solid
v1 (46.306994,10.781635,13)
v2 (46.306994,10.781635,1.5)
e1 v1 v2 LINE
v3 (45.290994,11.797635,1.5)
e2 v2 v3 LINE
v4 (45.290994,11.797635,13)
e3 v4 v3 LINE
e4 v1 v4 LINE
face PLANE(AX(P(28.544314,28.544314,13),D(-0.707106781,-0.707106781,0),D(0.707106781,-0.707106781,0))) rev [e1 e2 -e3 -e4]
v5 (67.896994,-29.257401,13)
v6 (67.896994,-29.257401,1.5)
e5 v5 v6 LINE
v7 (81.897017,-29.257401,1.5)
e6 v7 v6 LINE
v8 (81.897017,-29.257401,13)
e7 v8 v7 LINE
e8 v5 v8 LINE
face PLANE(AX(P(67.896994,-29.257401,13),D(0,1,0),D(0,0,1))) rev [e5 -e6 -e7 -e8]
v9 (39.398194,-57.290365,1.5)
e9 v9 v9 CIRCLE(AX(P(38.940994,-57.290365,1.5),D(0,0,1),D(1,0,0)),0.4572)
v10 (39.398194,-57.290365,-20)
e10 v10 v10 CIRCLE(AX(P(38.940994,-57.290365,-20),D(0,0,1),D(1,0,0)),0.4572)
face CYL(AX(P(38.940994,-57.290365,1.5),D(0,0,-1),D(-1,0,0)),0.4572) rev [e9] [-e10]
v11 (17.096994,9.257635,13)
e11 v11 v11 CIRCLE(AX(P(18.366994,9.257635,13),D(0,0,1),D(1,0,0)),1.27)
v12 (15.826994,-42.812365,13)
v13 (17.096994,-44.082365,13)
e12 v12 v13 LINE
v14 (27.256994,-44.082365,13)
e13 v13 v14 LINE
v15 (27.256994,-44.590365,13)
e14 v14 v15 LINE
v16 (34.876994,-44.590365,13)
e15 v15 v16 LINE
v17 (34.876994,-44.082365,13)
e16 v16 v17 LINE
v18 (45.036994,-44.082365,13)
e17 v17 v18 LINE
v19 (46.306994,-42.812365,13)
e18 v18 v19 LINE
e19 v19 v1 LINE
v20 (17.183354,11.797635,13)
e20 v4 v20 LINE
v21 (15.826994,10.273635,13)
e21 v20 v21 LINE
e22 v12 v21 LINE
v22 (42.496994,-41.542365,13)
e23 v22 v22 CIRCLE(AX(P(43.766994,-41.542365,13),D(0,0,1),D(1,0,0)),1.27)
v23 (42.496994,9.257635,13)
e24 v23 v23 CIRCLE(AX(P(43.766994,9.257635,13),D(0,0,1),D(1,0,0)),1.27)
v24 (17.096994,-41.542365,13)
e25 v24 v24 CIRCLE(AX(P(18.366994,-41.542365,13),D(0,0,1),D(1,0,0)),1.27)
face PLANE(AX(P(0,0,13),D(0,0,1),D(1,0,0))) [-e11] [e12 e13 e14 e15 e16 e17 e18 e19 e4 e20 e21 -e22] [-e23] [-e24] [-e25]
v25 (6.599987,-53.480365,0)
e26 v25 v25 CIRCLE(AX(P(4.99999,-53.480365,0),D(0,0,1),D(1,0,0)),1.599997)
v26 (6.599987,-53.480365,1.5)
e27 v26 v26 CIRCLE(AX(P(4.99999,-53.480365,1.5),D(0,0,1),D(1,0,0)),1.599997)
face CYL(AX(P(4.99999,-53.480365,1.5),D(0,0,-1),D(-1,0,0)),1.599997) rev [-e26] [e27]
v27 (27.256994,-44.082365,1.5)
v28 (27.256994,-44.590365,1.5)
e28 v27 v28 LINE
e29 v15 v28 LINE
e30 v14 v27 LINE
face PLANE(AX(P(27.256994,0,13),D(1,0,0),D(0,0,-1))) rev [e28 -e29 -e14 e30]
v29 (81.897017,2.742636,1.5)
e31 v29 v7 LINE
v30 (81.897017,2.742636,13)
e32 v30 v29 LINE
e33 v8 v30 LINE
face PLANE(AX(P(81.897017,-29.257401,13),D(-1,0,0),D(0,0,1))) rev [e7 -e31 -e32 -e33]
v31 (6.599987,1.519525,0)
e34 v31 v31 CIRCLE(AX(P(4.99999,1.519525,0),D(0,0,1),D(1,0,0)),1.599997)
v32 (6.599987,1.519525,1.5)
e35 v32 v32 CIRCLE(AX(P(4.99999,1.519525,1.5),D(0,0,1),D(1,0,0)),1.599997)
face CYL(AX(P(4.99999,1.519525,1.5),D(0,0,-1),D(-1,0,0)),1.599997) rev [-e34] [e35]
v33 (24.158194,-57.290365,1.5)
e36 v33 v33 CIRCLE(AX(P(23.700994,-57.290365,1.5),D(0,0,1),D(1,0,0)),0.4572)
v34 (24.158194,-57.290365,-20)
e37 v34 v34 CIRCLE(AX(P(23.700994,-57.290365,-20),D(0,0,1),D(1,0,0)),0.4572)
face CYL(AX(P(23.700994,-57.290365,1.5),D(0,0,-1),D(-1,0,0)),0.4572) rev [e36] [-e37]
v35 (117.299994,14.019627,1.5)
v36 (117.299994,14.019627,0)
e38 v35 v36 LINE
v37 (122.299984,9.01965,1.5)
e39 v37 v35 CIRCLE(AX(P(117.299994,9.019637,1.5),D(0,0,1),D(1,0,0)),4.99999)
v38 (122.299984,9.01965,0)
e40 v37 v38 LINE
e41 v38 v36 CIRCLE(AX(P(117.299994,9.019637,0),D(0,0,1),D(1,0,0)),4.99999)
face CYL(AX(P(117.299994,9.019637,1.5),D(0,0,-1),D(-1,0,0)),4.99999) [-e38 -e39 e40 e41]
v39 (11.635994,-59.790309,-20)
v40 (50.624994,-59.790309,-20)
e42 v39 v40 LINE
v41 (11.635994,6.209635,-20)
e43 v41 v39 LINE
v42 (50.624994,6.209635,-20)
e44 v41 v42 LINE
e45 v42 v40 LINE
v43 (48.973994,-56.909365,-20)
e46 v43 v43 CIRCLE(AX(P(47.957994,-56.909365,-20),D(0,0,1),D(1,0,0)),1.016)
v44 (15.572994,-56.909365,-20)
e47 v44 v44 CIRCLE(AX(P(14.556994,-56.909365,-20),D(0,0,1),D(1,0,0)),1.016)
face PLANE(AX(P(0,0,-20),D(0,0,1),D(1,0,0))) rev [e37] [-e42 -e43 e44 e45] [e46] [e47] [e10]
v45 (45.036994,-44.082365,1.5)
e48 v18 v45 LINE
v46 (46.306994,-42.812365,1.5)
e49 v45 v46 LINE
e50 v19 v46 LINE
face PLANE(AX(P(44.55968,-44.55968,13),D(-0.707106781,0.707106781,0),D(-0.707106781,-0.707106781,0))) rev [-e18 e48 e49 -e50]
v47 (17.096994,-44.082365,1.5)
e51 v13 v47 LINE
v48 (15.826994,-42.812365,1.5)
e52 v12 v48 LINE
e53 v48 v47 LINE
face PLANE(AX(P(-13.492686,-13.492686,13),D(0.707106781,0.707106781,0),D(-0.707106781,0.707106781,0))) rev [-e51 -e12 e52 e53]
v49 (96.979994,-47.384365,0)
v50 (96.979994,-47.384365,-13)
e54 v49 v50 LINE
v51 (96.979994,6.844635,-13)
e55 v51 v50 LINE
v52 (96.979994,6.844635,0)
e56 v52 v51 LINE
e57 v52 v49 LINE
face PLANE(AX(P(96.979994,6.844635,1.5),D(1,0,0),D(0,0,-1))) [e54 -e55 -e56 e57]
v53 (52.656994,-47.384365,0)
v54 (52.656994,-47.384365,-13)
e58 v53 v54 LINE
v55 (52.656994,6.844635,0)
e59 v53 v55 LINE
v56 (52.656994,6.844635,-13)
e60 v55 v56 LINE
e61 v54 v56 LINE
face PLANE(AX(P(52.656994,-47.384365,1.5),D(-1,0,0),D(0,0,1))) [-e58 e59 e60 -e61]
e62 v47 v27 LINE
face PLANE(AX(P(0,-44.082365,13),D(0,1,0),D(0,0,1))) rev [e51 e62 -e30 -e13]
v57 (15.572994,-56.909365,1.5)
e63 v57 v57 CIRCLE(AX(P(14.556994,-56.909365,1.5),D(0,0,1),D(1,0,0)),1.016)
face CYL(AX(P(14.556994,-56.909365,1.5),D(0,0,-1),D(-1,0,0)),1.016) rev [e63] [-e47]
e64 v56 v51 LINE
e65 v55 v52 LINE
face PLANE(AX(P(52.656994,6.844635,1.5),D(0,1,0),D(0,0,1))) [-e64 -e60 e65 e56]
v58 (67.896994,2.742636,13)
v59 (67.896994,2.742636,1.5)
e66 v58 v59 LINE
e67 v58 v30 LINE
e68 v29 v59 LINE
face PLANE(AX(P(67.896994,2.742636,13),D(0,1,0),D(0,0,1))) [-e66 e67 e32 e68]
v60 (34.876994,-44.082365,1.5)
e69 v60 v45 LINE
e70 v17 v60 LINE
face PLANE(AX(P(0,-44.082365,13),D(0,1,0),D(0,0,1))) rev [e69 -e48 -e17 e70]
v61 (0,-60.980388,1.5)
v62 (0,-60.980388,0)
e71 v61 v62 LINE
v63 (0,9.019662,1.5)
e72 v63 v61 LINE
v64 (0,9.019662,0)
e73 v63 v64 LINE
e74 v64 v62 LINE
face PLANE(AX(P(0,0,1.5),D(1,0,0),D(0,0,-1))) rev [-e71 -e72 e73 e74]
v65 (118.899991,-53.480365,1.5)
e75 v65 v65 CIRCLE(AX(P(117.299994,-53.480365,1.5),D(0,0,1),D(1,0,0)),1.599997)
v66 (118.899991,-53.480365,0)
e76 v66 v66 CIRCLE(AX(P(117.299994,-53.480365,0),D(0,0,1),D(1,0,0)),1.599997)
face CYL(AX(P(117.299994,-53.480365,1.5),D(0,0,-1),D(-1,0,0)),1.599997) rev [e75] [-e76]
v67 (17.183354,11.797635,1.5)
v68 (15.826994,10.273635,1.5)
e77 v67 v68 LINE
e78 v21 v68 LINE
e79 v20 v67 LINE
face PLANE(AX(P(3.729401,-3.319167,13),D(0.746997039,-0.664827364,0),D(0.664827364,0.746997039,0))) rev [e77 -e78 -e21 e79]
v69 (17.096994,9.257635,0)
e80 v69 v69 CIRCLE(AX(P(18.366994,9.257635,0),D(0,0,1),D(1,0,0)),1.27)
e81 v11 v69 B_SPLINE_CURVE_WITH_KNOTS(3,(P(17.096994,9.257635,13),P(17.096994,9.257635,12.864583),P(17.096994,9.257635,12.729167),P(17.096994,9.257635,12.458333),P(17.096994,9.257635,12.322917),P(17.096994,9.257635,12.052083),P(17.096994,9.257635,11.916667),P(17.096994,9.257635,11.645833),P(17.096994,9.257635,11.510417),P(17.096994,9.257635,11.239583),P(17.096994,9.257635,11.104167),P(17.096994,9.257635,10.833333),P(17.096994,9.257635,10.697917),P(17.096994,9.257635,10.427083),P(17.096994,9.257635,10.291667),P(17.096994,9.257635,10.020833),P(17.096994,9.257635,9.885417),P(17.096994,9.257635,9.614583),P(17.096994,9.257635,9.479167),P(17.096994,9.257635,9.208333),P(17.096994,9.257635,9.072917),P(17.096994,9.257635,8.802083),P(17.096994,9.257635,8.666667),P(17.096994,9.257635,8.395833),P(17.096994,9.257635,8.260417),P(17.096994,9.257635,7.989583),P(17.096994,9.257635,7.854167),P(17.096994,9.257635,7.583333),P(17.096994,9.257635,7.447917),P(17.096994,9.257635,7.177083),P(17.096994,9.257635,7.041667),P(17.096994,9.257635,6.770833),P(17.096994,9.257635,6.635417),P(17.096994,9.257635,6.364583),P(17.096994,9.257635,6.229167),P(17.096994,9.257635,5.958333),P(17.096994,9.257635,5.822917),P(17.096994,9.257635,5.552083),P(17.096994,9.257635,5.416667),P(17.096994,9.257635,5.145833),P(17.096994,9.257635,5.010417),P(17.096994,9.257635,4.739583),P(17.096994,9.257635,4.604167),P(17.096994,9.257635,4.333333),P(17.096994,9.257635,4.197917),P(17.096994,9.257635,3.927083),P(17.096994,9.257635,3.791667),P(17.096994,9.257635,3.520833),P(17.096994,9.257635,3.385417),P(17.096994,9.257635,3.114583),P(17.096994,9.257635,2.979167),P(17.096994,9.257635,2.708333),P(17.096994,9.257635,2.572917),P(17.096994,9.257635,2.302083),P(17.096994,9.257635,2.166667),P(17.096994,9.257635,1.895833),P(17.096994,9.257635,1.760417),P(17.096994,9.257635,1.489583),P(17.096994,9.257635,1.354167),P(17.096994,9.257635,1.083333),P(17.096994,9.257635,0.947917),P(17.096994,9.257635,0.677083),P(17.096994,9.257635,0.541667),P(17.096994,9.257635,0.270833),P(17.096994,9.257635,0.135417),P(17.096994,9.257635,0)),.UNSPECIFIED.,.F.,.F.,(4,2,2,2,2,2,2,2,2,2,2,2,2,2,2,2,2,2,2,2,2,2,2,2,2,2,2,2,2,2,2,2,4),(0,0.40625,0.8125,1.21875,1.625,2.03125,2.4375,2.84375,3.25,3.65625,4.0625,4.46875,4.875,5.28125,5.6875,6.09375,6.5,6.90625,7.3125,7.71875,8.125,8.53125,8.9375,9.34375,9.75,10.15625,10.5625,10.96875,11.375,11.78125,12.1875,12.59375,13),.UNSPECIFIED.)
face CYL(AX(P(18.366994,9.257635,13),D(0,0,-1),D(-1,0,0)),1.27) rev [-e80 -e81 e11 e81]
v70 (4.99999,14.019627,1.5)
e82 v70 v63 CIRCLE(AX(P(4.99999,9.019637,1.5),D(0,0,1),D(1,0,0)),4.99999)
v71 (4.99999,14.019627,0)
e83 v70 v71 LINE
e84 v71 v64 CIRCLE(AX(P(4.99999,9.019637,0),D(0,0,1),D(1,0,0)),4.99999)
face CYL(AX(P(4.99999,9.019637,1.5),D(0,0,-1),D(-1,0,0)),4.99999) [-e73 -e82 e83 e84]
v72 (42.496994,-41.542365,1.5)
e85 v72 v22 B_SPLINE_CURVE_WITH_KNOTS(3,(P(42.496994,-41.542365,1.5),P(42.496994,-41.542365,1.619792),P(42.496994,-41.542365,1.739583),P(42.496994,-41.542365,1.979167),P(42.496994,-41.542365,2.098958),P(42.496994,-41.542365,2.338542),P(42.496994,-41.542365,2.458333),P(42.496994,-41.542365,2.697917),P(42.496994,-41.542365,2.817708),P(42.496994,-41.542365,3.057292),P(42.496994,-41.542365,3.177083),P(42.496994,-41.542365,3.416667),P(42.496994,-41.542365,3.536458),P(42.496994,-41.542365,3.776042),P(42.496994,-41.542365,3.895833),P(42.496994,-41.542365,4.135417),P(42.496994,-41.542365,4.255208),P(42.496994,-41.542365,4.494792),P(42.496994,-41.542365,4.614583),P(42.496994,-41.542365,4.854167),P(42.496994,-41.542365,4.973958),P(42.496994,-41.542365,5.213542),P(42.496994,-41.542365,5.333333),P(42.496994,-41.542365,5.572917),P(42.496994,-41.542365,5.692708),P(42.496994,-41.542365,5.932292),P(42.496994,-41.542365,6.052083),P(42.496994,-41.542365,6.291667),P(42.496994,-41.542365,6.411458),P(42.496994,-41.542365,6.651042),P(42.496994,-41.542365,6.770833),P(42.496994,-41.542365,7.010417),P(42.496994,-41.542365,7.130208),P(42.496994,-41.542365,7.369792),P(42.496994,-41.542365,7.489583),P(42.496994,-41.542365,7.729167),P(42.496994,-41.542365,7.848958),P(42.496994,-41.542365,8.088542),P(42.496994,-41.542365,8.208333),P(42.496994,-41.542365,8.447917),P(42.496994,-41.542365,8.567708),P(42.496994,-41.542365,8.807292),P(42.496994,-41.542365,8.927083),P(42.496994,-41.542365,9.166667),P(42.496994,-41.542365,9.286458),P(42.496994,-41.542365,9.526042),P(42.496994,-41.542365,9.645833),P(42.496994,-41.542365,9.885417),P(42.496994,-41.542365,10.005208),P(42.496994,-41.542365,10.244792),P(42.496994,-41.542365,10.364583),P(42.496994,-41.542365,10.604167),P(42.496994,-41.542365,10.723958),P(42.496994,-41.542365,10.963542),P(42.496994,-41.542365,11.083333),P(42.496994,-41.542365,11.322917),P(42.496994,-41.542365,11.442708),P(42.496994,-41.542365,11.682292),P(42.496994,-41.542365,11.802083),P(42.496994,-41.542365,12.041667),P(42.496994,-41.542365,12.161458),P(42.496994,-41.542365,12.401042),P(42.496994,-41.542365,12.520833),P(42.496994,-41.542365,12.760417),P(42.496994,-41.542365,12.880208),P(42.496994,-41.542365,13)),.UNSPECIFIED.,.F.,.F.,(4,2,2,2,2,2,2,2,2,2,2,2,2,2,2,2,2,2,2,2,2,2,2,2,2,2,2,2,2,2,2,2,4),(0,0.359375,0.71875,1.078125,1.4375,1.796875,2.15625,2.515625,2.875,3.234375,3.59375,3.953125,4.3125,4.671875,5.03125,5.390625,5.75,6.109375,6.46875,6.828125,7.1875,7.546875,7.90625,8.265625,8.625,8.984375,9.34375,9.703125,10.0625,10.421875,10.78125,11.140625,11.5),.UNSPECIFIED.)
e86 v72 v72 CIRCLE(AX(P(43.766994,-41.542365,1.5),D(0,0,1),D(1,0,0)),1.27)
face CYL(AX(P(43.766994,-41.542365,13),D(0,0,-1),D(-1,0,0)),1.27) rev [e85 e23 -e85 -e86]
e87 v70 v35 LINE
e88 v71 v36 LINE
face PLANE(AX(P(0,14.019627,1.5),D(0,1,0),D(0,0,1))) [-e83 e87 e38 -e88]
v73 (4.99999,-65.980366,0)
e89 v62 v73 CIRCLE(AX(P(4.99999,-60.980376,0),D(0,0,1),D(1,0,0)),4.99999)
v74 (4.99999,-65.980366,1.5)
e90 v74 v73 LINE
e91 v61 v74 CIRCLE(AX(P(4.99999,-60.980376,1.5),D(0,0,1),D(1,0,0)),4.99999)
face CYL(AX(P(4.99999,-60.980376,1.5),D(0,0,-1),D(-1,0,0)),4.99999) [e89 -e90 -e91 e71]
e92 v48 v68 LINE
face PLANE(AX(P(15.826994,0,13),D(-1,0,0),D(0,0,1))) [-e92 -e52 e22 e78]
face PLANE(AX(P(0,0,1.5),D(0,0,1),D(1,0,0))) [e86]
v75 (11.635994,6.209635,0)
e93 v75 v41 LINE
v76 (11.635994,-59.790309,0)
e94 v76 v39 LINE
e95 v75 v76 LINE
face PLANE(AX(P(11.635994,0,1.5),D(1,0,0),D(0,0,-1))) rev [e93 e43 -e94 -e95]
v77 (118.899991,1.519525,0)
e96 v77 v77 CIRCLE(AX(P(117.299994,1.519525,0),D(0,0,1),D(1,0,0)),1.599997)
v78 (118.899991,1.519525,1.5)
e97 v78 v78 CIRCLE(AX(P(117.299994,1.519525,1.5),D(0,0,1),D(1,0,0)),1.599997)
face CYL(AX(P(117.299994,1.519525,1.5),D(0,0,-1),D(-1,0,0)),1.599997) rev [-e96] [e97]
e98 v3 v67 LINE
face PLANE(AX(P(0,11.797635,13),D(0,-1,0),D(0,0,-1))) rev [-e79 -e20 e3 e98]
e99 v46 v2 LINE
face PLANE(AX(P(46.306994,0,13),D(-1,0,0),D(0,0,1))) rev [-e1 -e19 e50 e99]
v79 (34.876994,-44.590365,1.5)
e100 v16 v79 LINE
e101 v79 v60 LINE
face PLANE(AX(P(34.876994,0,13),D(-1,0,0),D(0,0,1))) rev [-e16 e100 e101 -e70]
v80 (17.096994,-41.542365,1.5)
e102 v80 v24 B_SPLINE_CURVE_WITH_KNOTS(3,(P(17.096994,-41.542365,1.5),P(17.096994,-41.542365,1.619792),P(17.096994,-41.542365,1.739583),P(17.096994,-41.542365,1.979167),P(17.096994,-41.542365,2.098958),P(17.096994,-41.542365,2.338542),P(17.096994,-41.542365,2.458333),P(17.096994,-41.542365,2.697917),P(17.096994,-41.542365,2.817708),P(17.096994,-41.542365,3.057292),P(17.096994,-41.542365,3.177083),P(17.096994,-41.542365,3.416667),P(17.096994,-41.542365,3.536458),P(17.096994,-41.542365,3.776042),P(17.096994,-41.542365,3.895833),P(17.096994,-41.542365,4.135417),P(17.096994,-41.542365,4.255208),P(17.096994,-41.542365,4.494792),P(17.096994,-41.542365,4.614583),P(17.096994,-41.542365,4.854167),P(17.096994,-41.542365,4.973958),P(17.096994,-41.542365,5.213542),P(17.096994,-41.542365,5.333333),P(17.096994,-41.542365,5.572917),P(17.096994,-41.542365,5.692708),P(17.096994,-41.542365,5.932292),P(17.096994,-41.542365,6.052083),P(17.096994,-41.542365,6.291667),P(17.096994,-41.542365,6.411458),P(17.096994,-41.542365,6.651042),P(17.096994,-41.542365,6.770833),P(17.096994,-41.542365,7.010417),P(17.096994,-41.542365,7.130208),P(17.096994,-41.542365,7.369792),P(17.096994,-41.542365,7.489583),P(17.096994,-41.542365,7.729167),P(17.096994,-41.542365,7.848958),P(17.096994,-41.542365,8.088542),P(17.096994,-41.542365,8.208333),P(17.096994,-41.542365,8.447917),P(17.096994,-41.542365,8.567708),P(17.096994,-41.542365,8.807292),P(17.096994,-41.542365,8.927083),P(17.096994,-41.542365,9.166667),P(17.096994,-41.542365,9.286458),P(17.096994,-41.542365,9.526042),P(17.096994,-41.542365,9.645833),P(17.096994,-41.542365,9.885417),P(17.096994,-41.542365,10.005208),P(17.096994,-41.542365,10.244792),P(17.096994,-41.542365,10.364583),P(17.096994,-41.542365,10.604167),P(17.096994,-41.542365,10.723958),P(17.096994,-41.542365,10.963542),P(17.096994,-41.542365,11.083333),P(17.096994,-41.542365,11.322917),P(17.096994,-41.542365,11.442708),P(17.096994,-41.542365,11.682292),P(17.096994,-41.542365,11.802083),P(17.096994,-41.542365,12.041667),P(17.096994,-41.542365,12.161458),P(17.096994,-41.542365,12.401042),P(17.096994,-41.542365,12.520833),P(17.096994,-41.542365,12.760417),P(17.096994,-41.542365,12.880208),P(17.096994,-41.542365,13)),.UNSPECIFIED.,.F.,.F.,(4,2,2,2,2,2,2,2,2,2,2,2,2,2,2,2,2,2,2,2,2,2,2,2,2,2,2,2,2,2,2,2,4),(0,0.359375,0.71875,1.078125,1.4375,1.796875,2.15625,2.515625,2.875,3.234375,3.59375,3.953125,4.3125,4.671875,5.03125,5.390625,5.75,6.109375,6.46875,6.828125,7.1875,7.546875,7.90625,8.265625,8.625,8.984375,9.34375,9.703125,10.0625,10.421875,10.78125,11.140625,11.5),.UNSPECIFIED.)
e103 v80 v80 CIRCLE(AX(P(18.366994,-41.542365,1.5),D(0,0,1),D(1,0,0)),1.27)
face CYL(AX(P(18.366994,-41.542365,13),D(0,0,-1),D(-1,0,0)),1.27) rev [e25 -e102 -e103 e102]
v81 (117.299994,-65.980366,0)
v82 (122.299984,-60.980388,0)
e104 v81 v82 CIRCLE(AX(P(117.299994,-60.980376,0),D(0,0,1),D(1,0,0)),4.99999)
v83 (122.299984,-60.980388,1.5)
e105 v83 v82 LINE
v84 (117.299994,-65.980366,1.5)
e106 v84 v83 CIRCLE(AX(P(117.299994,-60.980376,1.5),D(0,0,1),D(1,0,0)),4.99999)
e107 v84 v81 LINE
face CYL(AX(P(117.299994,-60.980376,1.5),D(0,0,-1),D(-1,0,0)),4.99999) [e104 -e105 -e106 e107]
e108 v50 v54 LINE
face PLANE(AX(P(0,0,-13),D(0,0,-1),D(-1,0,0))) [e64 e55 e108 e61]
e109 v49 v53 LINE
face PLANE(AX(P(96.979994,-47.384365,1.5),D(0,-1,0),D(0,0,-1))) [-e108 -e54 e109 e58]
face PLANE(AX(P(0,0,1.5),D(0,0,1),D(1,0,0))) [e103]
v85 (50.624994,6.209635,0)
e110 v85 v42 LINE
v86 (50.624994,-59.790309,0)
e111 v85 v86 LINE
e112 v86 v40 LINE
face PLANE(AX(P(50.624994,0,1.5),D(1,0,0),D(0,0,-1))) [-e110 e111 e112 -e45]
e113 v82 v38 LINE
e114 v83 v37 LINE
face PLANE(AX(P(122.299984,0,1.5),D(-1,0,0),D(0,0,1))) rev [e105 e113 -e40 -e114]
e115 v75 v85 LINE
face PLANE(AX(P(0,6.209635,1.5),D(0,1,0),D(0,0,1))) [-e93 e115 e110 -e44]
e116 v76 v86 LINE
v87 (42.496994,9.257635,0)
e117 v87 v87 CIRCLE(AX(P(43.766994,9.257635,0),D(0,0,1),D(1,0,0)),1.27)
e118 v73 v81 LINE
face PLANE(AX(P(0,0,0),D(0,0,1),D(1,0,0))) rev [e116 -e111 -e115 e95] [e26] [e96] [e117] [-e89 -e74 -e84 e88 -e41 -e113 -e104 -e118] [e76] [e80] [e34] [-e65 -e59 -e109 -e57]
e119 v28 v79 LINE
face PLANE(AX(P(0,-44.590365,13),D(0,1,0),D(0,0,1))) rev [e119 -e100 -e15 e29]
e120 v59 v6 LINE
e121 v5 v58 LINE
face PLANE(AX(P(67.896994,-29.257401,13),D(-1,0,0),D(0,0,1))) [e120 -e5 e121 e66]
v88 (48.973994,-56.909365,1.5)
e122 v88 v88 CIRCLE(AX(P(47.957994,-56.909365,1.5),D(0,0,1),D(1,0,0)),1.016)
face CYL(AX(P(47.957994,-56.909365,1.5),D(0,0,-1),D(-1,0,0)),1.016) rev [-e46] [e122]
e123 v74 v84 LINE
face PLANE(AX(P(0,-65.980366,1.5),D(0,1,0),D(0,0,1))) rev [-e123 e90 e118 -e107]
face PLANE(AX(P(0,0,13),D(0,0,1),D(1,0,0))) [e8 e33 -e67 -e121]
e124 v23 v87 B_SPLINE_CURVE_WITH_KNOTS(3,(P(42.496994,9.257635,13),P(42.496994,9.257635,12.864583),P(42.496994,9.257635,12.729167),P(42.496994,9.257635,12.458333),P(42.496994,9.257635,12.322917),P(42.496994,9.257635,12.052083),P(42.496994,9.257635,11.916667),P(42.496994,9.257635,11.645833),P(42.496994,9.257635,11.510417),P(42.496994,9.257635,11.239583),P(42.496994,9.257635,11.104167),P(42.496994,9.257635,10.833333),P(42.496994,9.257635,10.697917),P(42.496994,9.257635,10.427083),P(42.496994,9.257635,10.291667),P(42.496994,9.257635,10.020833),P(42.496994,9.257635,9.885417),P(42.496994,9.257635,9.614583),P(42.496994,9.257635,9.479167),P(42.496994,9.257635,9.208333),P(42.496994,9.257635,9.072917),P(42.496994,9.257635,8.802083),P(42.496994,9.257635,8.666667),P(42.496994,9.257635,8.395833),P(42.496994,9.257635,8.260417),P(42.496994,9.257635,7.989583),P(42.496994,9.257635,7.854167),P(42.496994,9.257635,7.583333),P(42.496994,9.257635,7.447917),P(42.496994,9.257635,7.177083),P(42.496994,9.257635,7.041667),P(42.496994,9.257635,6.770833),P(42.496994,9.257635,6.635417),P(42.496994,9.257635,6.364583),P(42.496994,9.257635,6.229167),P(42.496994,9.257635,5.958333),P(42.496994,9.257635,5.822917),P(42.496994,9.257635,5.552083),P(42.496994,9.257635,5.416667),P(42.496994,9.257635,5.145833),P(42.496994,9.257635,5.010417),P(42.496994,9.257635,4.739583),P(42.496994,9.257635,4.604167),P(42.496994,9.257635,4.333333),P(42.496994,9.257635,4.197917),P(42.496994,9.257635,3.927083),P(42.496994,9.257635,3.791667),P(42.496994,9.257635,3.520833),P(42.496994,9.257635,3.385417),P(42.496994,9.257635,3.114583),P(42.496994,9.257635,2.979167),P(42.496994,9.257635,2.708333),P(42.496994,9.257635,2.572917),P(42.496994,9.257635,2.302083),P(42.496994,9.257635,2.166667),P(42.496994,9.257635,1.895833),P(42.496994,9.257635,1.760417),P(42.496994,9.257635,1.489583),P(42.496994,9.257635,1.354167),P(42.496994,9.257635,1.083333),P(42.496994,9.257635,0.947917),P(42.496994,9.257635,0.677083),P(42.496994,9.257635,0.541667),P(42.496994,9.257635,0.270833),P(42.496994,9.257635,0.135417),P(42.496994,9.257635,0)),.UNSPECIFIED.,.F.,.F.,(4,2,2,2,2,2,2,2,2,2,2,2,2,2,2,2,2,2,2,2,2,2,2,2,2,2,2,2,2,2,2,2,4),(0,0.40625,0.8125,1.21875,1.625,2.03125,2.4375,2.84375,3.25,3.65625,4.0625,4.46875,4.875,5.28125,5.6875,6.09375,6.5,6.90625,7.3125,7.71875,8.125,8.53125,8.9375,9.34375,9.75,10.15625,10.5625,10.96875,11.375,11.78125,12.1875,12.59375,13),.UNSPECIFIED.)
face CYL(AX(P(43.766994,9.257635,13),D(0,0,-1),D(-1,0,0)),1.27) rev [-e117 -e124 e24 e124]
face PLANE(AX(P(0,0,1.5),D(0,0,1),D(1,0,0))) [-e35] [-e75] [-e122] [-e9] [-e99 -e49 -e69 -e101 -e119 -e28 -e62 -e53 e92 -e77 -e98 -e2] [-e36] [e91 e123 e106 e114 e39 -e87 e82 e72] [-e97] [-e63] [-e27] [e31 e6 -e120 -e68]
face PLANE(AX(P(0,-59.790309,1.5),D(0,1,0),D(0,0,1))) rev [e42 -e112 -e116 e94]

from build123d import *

# Parameters (mm, degrees)
EXTRUDE_4_OUTLINE_R  = 1.5999968
EXTRUDE_4_OUTLINE_W  = 44.323
EXTRUDE_4_OUTLINE_H  = 54.229
EXTRUDE_4_DEPTH      = 1.5
EXTRUDE_5_DEPTH      = 1.5
EXTRUDE_5_DEPTH_BACK = 13
SKETCH_3_W           = 44.323
SKETCH_3_H           = 54.229
SKETCH_5_R           = 1.27
SKETCH_5_W           = 14.0000228
SKETCH_5_H           = 32.0000376
EXTRUDE_6_DEPTH      = 13
EXTRUDE_8_DEPTH      = 1.5
EXTRUDE_8_DEPTH_BACK = 20
SKETCH_6_W           = 38.989
SKETCH_6_H           = 65.9999442
SKETCH_6_R           = 1.016
SKETCH_6_R_2         = 0.4572


# Read off the part's stored shape, not the designer's step: 凸台-拉伸4
with BuildPart() as part:
    # 凸台-拉伸4 outline → 凸台-拉伸4 (new body)
    with BuildSketch(Plane.XY):
        with BuildLine():
            ThreePointArc((122.299984025, 9.019649552), (120.835516371, 12.55516818), (117.299994025, 14.019626857))
            Line((117.299994025, 14.019626857), (4.999990016, 14.019626857))
            ThreePointArc((4.999990016, 14.019626857), (1.464472156, 12.555172669), (1.1e-08, 9.019662248))
            Line((1.1e-08, 9.019662248), (1.1e-08, -60.980388257))
            ThreePointArc((1.1e-08, -60.980388257), (1.464467665, -64.515906885), (4.999990011, -65.980365562))
            Line((4.999990011, -65.980365562), (117.29999402, -65.980365562))
            ThreePointArc((117.29999402, -65.980365562), (120.835516369, -64.515906884), (122.299984025, -60.980388255))
            Line((122.299984025, -60.980388255), (122.299984025, 9.019649552))
        make_face()
        with Locations((4.999990011, -53.480365152)):
            Circle(EXTRUDE_4_OUTLINE_R, mode=Mode.SUBTRACT)
        with Locations((117.299994011, -53.480365152)):
            Circle(EXTRUDE_4_OUTLINE_R, mode=Mode.SUBTRACT)
        Polygon((11.635994011, 6.209634848), (15.826994011, 6.209634848), (15.826994011, 10.273634848), (17.183354011, 11.797634848), (45.290994011, 11.797634848), (46.306994011, 10.781634848), (46.306994011, 6.209634848), (50.624994011, 6.209634848), (50.624994011, -59.790309352), (11.635994011, -59.790309352), align=None, mode=Mode.SUBTRACT)
        with Locations((4.999990011, 1.519524848)):
            Circle(EXTRUDE_4_OUTLINE_R, mode=Mode.SUBTRACT)
        with Locations((74.818494011, -20.269865152)):
            Rectangle(EXTRUDE_4_OUTLINE_W, EXTRUDE_4_OUTLINE_H, mode=Mode.SUBTRACT)
        with Locations((117.299994011, 1.519524848)):
            Circle(EXTRUDE_4_OUTLINE_R, mode=Mode.SUBTRACT)
    extrude(amount=EXTRUDE_4_DEPTH)



with BuildPart() as body_2:
    # 草图3 → 凸台-拉伸5 (new, two sides: drawn at the far end of the back side and taken through both)
    with BuildSketch(Plane.XY.offset(-EXTRUDE_5_DEPTH_BACK)):
        with Locations((74.818494011, -20.269865152)):
            Rectangle(SKETCH_3_W, SKETCH_3_H)
    extrude(amount=EXTRUDE_5_DEPTH + EXTRUDE_5_DEPTH_BACK)


with BuildPart() as part_1:
    add(part.part)

    add(body_2.part)  # 凸台-拉伸6 merges body 2
    # 草图5 → 凸台-拉伸6 (add)
    # profile 1 of 3: a face of its own
    with BuildSketch(Plane.XY):
        Polygon((46.306994011, 6.209634848), (15.826994011, 6.209634848), (15.826994011, -42.812365152), (17.096994011, -44.082365152), (27.256994011, -44.082365152), (27.256994011, -44.590365152), (34.876994011, -44.590365152), (34.876994011, -44.082365152), (45.036994011, -44.082365152), (46.306994011, -42.812365152), align=None)
        with Locations(Location((18.366994011, -41.542365152, 0), (0, 0, 180))):
            Circle(SKETCH_5_R, mode=Mode.SUBTRACT)
        with Locations(Location((43.766994011, -41.542365152, 0), (0, 0, 180))):
            Circle(SKETCH_5_R, mode=Mode.SUBTRACT)
    # profile 2 of 3: a face of its own
    with BuildSketch(Plane.XY):
        Polygon((15.826994011, 10.273634848), (15.826994011, 6.209634848), (46.306994011, 6.209634848), (46.306994011, 10.781634848), (45.290994011, 11.797634848), (38.686994011, 11.797634848), (23.446994011, 11.797634848), (17.183354011, 11.797634848), align=None)
        with Locations(Location((18.366994011, 9.257634848, 0), (0, 0, 180))):
            Circle(SKETCH_5_R, mode=Mode.SUBTRACT)
        with Locations(Location((43.766994011, 9.257634848, 0), (0, 0, 180))):
            Circle(SKETCH_5_R, mode=Mode.SUBTRACT)
    # profile 3 of 3: a face of its own
    with BuildSketch(Plane.XY):
        with Locations((74.897005411, -13.257382352)):
            Rectangle(SKETCH_5_W, SKETCH_5_H)
    extrude(amount=EXTRUDE_6_DEPTH)

    # 草图6 → 凸台-拉伸8 (add, two sides: drawn at the far end of the back side and taken through both)
    with BuildSketch(Plane.XY.offset(-EXTRUDE_8_DEPTH_BACK)):
        with Locations((31.130494011, -26.790337252)):
            Rectangle(SKETCH_6_W, SKETCH_6_H)
        with Locations((14.556994011, -56.909365152)):
            Circle(SKETCH_6_R, mode=Mode.SUBTRACT)
        with Locations((23.700994011, -57.290365152)):
            Circle(SKETCH_6_R_2, mode=Mode.SUBTRACT)
        with Locations((38.940994011, -57.290365152)):
            Circle(SKETCH_6_R_2, mode=Mode.SUBTRACT)
        with Locations((47.957994011, -56.909365152)):
            Circle(SKETCH_6_R, mode=Mode.SUBTRACT)
    extrude(amount=EXTRUDE_8_DEPTH + EXTRUDE_8_DEPTH_BACK)


solid = part_1.part
